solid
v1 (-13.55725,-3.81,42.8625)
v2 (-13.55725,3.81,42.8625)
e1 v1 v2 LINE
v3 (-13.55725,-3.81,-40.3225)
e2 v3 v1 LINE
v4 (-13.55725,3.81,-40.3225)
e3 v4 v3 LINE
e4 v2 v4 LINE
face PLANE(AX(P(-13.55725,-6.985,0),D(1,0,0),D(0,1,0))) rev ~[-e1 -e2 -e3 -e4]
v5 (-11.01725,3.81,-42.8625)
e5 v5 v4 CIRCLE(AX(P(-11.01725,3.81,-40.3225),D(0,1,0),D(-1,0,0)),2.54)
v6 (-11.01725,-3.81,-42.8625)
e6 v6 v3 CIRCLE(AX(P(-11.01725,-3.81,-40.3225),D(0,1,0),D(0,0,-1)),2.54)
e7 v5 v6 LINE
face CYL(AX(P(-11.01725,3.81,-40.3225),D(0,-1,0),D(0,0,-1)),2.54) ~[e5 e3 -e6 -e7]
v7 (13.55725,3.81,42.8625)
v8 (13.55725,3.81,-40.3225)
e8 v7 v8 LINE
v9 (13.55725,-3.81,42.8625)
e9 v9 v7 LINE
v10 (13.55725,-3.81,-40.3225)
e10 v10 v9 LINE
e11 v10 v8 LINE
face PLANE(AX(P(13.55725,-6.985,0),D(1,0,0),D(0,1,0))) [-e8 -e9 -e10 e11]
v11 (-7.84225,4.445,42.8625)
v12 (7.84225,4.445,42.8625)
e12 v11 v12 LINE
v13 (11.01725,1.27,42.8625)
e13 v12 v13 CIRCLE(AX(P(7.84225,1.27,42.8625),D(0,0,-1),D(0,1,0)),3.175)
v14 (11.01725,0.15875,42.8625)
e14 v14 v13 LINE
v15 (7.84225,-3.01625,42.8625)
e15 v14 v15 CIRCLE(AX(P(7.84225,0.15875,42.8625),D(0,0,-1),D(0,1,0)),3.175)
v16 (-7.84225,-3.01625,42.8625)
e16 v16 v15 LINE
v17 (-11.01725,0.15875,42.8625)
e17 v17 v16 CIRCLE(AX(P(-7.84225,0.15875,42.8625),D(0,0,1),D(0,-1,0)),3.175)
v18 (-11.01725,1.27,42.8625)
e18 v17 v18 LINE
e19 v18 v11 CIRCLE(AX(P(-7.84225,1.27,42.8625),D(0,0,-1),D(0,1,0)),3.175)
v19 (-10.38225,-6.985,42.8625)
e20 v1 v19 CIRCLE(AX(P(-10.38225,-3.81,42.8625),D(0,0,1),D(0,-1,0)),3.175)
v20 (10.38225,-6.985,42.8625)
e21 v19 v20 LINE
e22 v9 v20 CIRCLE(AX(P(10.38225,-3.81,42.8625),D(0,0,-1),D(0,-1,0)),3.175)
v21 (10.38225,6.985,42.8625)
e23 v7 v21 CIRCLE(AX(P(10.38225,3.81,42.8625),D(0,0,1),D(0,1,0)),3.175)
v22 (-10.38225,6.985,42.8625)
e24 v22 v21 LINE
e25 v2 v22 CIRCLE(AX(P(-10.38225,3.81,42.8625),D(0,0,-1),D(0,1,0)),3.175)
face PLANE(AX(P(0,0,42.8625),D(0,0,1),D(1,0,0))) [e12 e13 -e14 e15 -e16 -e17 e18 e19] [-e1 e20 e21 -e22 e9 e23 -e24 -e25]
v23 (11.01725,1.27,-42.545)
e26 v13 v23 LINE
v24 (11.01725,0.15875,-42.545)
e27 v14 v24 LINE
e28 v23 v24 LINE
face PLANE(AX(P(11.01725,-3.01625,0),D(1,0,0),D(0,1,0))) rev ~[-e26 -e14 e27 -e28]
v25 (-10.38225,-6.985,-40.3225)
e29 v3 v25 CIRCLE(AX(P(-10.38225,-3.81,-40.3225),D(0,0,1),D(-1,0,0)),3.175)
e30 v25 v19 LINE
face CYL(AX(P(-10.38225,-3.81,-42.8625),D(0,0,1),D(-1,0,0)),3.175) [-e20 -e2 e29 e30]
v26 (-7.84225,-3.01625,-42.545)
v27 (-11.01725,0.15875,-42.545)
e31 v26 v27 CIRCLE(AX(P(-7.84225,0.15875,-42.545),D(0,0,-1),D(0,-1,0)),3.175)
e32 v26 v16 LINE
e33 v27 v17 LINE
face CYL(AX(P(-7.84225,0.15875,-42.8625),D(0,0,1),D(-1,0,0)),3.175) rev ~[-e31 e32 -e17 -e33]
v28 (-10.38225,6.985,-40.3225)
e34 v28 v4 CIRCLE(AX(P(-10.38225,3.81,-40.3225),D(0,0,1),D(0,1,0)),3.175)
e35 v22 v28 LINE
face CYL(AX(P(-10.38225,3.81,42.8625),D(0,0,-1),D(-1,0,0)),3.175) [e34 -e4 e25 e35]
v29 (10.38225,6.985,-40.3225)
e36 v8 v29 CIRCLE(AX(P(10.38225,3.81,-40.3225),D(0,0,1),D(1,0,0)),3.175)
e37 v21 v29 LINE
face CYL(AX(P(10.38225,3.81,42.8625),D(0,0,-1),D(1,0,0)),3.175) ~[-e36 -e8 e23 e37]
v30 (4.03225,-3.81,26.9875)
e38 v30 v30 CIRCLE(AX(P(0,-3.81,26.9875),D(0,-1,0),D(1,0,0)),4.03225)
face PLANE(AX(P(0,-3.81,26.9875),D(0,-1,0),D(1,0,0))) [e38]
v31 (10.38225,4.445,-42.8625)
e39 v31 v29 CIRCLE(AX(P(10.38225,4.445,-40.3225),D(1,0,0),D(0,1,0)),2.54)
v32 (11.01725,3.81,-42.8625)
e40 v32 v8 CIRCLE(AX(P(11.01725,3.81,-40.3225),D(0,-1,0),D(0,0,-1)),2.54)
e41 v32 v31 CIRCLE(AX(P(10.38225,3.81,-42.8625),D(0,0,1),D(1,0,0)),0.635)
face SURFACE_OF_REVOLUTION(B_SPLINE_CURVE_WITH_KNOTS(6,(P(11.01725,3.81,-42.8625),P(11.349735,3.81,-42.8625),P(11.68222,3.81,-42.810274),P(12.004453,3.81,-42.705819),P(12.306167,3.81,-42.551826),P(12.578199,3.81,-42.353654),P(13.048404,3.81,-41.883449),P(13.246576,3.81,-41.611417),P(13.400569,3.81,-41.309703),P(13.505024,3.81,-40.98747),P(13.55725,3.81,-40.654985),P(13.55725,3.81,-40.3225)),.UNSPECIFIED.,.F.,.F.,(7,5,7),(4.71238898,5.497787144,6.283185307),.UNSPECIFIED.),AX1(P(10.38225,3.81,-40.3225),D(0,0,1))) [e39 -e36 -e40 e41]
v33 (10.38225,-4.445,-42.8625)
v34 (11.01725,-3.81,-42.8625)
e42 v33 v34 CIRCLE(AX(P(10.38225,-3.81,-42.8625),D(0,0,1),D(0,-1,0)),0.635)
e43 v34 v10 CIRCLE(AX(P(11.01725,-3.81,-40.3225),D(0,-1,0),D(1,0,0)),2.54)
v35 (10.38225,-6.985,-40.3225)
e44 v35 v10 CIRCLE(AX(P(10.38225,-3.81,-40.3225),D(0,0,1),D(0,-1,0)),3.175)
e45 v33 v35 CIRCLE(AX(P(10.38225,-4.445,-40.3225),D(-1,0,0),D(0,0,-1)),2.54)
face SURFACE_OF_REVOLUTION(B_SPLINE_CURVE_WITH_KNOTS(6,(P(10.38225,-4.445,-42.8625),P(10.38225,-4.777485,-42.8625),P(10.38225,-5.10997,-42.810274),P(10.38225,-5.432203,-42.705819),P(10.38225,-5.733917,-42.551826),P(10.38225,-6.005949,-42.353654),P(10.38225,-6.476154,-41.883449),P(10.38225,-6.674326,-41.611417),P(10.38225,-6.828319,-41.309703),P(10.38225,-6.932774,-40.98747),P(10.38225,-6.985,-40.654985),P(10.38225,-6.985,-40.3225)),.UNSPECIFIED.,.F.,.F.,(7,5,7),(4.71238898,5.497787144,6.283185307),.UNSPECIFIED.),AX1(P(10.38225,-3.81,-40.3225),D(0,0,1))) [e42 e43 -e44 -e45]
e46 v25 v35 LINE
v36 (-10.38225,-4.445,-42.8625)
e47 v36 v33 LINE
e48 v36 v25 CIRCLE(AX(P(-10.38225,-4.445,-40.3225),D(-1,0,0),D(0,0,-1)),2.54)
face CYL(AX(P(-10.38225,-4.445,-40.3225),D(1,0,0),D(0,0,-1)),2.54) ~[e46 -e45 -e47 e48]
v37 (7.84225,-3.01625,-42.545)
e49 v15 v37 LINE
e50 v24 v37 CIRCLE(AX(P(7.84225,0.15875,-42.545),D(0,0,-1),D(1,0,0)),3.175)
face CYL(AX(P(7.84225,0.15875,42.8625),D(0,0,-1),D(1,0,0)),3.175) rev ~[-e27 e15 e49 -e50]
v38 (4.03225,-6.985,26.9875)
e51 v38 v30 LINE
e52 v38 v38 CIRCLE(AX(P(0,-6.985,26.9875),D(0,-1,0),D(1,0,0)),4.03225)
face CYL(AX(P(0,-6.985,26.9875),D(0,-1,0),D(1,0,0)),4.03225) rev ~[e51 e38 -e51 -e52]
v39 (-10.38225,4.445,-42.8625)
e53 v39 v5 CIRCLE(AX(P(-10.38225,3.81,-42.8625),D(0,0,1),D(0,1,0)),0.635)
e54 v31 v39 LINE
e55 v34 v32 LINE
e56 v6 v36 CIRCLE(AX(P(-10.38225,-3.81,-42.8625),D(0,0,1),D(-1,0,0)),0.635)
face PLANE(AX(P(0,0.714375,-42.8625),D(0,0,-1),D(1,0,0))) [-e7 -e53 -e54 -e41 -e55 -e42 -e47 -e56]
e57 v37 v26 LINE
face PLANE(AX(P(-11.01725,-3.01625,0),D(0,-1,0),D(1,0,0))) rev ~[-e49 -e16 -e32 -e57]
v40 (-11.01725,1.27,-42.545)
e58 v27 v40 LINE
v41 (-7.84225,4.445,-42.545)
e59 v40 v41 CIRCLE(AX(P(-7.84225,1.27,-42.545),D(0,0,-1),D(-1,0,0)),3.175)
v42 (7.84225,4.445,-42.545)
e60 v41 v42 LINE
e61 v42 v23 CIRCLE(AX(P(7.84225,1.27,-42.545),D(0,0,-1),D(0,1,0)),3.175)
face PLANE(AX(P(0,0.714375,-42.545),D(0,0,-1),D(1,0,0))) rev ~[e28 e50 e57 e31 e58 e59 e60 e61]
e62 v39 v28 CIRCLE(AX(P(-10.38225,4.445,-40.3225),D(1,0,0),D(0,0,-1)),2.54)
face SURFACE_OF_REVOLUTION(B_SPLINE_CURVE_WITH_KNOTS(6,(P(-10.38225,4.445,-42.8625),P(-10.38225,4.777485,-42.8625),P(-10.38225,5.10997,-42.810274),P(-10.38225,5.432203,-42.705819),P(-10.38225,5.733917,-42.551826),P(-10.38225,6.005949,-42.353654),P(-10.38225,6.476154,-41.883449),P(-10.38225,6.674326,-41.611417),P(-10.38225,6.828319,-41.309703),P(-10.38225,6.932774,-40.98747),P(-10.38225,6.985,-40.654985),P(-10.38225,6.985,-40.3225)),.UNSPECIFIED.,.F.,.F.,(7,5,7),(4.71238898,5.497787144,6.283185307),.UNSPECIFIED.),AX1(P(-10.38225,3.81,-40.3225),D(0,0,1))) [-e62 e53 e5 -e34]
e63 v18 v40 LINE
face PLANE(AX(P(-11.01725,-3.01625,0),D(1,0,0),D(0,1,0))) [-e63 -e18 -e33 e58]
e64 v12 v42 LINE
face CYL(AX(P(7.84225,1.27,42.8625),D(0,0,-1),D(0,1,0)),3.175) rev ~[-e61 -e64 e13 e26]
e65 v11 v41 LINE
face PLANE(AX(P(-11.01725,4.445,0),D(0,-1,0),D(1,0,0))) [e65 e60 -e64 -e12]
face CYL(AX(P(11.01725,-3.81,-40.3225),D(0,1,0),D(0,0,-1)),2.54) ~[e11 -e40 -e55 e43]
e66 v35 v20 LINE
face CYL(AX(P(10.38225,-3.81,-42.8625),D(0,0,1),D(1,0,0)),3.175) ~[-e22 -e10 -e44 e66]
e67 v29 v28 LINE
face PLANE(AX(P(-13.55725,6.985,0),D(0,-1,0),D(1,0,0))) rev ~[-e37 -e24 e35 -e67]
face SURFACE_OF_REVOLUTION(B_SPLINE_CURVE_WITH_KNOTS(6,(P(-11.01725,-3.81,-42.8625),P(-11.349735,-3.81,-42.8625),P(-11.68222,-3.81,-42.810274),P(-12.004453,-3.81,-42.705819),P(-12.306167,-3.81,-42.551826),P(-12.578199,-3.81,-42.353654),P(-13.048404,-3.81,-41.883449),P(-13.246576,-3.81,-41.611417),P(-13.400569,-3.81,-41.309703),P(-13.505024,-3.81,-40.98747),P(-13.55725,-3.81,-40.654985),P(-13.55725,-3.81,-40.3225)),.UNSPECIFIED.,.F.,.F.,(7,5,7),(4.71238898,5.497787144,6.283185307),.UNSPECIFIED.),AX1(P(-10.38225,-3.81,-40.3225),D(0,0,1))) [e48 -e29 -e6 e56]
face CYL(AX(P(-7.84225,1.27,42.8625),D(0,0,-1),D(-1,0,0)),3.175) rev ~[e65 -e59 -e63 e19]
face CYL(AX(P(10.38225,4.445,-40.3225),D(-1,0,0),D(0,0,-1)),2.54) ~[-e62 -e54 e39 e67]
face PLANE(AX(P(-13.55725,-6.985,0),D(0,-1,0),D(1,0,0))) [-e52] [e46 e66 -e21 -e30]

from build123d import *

# Parameters (mm, degrees)
F0_W     = 27.1145
F0_H     = 13.97
F0_W_2   = 22.0345
F0_H_2   = 7.46125
F1_DEPTH = 42.8625
F2_R     = 3.175
F3_R     = 4.03225
F4_DEPTH = 3.175
F6_DEPTH = 0.3175
F7_R     = 2.54


with BuildPart() as f1:
    # F0 (on Top) → F1 (new body, symmetric)
    with BuildSketch(Plane.XY):
        Rectangle(F0_W, F0_H)
        with Locations((0, 0.714375)):
            Rectangle(F0_W_2, F0_H_2, mode=Mode.SUBTRACT)
    extrude(amount=F1_DEPTH, both=True)

    # F2
    f2_edges = [f1.edges().sort_by_distance(p)[0] for p in [
        (13.55725, -6.985, 0),
        (-13.55725, -6.985, 0),
        (-13.55725, 6.985, 0),
        (13.55725, 6.985, 0),
        (-11.01725, 4.445, 0),
        (11.01725, 4.445, 0),
        (11.01725, -3.01625, 0),
        (-11.01725, -3.01625, 0),
    ]]
    fillet(f2_edges, radius=F2_R)

    # F3 (on face) → F4 (cut)
    with BuildSketch(Plane.XZ.offset(6.985)):
        with Locations((0, 26.9875)):
            Circle(F3_R)
    extrude(amount=-F4_DEPTH, mode=Mode.SUBTRACT)

    # F5 (on face) → F6 (join)
    with BuildSketch(Plane(origin=(0, 0, -42.8625), x_dir=(1, 0, 0), z_dir=(0, 0, -1))):
        with BuildLine():
            ThreePointArc((11.01725, -0.15875), (10.0873140303, 2.0863140303), (7.84225, 3.01625))
            Line((7.84225, 3.01625), (-7.84225, 3.01625))
            ThreePointArc((-7.84225, 3.01625), (-10.0873140303, 2.0863140303), (-11.01725, -0.15875))
            Line((-11.01725, -0.15875), (-11.01725, -1.27))
            ThreePointArc((-11.01725, -1.27), (-10.0873140303, -3.5150640303), (-7.84225, -4.445))
            Line((-7.84225, -4.445), (7.84225, -4.445))
            ThreePointArc((7.84225, -4.445), (10.0873140303, -3.5150640303), (11.01725, -1.27))
            Line((11.01725, -1.27), (11.01725, -0.15875))
        make_face()
    extrude(amount=-F6_DEPTH)

    # F7
    f7_edges = [f1.edges().sort_by_distance(p)[0] for p in [
        (0, -6.985, -42.8625),
        (12.627314, -6.055064, -42.8625),
        (13.55725, 0, -42.8625),
        (12.627314, 6.055064, -42.8625),
        (0, 6.985, -42.8625),
        (-12.627314, 6.055064, -42.8625),
        (-13.55725, 0, -42.8625),
        (-12.627314, -6.055064, -42.8625),
    ]]
    fillet(f7_edges, radius=F7_R)


solid = f1.part
